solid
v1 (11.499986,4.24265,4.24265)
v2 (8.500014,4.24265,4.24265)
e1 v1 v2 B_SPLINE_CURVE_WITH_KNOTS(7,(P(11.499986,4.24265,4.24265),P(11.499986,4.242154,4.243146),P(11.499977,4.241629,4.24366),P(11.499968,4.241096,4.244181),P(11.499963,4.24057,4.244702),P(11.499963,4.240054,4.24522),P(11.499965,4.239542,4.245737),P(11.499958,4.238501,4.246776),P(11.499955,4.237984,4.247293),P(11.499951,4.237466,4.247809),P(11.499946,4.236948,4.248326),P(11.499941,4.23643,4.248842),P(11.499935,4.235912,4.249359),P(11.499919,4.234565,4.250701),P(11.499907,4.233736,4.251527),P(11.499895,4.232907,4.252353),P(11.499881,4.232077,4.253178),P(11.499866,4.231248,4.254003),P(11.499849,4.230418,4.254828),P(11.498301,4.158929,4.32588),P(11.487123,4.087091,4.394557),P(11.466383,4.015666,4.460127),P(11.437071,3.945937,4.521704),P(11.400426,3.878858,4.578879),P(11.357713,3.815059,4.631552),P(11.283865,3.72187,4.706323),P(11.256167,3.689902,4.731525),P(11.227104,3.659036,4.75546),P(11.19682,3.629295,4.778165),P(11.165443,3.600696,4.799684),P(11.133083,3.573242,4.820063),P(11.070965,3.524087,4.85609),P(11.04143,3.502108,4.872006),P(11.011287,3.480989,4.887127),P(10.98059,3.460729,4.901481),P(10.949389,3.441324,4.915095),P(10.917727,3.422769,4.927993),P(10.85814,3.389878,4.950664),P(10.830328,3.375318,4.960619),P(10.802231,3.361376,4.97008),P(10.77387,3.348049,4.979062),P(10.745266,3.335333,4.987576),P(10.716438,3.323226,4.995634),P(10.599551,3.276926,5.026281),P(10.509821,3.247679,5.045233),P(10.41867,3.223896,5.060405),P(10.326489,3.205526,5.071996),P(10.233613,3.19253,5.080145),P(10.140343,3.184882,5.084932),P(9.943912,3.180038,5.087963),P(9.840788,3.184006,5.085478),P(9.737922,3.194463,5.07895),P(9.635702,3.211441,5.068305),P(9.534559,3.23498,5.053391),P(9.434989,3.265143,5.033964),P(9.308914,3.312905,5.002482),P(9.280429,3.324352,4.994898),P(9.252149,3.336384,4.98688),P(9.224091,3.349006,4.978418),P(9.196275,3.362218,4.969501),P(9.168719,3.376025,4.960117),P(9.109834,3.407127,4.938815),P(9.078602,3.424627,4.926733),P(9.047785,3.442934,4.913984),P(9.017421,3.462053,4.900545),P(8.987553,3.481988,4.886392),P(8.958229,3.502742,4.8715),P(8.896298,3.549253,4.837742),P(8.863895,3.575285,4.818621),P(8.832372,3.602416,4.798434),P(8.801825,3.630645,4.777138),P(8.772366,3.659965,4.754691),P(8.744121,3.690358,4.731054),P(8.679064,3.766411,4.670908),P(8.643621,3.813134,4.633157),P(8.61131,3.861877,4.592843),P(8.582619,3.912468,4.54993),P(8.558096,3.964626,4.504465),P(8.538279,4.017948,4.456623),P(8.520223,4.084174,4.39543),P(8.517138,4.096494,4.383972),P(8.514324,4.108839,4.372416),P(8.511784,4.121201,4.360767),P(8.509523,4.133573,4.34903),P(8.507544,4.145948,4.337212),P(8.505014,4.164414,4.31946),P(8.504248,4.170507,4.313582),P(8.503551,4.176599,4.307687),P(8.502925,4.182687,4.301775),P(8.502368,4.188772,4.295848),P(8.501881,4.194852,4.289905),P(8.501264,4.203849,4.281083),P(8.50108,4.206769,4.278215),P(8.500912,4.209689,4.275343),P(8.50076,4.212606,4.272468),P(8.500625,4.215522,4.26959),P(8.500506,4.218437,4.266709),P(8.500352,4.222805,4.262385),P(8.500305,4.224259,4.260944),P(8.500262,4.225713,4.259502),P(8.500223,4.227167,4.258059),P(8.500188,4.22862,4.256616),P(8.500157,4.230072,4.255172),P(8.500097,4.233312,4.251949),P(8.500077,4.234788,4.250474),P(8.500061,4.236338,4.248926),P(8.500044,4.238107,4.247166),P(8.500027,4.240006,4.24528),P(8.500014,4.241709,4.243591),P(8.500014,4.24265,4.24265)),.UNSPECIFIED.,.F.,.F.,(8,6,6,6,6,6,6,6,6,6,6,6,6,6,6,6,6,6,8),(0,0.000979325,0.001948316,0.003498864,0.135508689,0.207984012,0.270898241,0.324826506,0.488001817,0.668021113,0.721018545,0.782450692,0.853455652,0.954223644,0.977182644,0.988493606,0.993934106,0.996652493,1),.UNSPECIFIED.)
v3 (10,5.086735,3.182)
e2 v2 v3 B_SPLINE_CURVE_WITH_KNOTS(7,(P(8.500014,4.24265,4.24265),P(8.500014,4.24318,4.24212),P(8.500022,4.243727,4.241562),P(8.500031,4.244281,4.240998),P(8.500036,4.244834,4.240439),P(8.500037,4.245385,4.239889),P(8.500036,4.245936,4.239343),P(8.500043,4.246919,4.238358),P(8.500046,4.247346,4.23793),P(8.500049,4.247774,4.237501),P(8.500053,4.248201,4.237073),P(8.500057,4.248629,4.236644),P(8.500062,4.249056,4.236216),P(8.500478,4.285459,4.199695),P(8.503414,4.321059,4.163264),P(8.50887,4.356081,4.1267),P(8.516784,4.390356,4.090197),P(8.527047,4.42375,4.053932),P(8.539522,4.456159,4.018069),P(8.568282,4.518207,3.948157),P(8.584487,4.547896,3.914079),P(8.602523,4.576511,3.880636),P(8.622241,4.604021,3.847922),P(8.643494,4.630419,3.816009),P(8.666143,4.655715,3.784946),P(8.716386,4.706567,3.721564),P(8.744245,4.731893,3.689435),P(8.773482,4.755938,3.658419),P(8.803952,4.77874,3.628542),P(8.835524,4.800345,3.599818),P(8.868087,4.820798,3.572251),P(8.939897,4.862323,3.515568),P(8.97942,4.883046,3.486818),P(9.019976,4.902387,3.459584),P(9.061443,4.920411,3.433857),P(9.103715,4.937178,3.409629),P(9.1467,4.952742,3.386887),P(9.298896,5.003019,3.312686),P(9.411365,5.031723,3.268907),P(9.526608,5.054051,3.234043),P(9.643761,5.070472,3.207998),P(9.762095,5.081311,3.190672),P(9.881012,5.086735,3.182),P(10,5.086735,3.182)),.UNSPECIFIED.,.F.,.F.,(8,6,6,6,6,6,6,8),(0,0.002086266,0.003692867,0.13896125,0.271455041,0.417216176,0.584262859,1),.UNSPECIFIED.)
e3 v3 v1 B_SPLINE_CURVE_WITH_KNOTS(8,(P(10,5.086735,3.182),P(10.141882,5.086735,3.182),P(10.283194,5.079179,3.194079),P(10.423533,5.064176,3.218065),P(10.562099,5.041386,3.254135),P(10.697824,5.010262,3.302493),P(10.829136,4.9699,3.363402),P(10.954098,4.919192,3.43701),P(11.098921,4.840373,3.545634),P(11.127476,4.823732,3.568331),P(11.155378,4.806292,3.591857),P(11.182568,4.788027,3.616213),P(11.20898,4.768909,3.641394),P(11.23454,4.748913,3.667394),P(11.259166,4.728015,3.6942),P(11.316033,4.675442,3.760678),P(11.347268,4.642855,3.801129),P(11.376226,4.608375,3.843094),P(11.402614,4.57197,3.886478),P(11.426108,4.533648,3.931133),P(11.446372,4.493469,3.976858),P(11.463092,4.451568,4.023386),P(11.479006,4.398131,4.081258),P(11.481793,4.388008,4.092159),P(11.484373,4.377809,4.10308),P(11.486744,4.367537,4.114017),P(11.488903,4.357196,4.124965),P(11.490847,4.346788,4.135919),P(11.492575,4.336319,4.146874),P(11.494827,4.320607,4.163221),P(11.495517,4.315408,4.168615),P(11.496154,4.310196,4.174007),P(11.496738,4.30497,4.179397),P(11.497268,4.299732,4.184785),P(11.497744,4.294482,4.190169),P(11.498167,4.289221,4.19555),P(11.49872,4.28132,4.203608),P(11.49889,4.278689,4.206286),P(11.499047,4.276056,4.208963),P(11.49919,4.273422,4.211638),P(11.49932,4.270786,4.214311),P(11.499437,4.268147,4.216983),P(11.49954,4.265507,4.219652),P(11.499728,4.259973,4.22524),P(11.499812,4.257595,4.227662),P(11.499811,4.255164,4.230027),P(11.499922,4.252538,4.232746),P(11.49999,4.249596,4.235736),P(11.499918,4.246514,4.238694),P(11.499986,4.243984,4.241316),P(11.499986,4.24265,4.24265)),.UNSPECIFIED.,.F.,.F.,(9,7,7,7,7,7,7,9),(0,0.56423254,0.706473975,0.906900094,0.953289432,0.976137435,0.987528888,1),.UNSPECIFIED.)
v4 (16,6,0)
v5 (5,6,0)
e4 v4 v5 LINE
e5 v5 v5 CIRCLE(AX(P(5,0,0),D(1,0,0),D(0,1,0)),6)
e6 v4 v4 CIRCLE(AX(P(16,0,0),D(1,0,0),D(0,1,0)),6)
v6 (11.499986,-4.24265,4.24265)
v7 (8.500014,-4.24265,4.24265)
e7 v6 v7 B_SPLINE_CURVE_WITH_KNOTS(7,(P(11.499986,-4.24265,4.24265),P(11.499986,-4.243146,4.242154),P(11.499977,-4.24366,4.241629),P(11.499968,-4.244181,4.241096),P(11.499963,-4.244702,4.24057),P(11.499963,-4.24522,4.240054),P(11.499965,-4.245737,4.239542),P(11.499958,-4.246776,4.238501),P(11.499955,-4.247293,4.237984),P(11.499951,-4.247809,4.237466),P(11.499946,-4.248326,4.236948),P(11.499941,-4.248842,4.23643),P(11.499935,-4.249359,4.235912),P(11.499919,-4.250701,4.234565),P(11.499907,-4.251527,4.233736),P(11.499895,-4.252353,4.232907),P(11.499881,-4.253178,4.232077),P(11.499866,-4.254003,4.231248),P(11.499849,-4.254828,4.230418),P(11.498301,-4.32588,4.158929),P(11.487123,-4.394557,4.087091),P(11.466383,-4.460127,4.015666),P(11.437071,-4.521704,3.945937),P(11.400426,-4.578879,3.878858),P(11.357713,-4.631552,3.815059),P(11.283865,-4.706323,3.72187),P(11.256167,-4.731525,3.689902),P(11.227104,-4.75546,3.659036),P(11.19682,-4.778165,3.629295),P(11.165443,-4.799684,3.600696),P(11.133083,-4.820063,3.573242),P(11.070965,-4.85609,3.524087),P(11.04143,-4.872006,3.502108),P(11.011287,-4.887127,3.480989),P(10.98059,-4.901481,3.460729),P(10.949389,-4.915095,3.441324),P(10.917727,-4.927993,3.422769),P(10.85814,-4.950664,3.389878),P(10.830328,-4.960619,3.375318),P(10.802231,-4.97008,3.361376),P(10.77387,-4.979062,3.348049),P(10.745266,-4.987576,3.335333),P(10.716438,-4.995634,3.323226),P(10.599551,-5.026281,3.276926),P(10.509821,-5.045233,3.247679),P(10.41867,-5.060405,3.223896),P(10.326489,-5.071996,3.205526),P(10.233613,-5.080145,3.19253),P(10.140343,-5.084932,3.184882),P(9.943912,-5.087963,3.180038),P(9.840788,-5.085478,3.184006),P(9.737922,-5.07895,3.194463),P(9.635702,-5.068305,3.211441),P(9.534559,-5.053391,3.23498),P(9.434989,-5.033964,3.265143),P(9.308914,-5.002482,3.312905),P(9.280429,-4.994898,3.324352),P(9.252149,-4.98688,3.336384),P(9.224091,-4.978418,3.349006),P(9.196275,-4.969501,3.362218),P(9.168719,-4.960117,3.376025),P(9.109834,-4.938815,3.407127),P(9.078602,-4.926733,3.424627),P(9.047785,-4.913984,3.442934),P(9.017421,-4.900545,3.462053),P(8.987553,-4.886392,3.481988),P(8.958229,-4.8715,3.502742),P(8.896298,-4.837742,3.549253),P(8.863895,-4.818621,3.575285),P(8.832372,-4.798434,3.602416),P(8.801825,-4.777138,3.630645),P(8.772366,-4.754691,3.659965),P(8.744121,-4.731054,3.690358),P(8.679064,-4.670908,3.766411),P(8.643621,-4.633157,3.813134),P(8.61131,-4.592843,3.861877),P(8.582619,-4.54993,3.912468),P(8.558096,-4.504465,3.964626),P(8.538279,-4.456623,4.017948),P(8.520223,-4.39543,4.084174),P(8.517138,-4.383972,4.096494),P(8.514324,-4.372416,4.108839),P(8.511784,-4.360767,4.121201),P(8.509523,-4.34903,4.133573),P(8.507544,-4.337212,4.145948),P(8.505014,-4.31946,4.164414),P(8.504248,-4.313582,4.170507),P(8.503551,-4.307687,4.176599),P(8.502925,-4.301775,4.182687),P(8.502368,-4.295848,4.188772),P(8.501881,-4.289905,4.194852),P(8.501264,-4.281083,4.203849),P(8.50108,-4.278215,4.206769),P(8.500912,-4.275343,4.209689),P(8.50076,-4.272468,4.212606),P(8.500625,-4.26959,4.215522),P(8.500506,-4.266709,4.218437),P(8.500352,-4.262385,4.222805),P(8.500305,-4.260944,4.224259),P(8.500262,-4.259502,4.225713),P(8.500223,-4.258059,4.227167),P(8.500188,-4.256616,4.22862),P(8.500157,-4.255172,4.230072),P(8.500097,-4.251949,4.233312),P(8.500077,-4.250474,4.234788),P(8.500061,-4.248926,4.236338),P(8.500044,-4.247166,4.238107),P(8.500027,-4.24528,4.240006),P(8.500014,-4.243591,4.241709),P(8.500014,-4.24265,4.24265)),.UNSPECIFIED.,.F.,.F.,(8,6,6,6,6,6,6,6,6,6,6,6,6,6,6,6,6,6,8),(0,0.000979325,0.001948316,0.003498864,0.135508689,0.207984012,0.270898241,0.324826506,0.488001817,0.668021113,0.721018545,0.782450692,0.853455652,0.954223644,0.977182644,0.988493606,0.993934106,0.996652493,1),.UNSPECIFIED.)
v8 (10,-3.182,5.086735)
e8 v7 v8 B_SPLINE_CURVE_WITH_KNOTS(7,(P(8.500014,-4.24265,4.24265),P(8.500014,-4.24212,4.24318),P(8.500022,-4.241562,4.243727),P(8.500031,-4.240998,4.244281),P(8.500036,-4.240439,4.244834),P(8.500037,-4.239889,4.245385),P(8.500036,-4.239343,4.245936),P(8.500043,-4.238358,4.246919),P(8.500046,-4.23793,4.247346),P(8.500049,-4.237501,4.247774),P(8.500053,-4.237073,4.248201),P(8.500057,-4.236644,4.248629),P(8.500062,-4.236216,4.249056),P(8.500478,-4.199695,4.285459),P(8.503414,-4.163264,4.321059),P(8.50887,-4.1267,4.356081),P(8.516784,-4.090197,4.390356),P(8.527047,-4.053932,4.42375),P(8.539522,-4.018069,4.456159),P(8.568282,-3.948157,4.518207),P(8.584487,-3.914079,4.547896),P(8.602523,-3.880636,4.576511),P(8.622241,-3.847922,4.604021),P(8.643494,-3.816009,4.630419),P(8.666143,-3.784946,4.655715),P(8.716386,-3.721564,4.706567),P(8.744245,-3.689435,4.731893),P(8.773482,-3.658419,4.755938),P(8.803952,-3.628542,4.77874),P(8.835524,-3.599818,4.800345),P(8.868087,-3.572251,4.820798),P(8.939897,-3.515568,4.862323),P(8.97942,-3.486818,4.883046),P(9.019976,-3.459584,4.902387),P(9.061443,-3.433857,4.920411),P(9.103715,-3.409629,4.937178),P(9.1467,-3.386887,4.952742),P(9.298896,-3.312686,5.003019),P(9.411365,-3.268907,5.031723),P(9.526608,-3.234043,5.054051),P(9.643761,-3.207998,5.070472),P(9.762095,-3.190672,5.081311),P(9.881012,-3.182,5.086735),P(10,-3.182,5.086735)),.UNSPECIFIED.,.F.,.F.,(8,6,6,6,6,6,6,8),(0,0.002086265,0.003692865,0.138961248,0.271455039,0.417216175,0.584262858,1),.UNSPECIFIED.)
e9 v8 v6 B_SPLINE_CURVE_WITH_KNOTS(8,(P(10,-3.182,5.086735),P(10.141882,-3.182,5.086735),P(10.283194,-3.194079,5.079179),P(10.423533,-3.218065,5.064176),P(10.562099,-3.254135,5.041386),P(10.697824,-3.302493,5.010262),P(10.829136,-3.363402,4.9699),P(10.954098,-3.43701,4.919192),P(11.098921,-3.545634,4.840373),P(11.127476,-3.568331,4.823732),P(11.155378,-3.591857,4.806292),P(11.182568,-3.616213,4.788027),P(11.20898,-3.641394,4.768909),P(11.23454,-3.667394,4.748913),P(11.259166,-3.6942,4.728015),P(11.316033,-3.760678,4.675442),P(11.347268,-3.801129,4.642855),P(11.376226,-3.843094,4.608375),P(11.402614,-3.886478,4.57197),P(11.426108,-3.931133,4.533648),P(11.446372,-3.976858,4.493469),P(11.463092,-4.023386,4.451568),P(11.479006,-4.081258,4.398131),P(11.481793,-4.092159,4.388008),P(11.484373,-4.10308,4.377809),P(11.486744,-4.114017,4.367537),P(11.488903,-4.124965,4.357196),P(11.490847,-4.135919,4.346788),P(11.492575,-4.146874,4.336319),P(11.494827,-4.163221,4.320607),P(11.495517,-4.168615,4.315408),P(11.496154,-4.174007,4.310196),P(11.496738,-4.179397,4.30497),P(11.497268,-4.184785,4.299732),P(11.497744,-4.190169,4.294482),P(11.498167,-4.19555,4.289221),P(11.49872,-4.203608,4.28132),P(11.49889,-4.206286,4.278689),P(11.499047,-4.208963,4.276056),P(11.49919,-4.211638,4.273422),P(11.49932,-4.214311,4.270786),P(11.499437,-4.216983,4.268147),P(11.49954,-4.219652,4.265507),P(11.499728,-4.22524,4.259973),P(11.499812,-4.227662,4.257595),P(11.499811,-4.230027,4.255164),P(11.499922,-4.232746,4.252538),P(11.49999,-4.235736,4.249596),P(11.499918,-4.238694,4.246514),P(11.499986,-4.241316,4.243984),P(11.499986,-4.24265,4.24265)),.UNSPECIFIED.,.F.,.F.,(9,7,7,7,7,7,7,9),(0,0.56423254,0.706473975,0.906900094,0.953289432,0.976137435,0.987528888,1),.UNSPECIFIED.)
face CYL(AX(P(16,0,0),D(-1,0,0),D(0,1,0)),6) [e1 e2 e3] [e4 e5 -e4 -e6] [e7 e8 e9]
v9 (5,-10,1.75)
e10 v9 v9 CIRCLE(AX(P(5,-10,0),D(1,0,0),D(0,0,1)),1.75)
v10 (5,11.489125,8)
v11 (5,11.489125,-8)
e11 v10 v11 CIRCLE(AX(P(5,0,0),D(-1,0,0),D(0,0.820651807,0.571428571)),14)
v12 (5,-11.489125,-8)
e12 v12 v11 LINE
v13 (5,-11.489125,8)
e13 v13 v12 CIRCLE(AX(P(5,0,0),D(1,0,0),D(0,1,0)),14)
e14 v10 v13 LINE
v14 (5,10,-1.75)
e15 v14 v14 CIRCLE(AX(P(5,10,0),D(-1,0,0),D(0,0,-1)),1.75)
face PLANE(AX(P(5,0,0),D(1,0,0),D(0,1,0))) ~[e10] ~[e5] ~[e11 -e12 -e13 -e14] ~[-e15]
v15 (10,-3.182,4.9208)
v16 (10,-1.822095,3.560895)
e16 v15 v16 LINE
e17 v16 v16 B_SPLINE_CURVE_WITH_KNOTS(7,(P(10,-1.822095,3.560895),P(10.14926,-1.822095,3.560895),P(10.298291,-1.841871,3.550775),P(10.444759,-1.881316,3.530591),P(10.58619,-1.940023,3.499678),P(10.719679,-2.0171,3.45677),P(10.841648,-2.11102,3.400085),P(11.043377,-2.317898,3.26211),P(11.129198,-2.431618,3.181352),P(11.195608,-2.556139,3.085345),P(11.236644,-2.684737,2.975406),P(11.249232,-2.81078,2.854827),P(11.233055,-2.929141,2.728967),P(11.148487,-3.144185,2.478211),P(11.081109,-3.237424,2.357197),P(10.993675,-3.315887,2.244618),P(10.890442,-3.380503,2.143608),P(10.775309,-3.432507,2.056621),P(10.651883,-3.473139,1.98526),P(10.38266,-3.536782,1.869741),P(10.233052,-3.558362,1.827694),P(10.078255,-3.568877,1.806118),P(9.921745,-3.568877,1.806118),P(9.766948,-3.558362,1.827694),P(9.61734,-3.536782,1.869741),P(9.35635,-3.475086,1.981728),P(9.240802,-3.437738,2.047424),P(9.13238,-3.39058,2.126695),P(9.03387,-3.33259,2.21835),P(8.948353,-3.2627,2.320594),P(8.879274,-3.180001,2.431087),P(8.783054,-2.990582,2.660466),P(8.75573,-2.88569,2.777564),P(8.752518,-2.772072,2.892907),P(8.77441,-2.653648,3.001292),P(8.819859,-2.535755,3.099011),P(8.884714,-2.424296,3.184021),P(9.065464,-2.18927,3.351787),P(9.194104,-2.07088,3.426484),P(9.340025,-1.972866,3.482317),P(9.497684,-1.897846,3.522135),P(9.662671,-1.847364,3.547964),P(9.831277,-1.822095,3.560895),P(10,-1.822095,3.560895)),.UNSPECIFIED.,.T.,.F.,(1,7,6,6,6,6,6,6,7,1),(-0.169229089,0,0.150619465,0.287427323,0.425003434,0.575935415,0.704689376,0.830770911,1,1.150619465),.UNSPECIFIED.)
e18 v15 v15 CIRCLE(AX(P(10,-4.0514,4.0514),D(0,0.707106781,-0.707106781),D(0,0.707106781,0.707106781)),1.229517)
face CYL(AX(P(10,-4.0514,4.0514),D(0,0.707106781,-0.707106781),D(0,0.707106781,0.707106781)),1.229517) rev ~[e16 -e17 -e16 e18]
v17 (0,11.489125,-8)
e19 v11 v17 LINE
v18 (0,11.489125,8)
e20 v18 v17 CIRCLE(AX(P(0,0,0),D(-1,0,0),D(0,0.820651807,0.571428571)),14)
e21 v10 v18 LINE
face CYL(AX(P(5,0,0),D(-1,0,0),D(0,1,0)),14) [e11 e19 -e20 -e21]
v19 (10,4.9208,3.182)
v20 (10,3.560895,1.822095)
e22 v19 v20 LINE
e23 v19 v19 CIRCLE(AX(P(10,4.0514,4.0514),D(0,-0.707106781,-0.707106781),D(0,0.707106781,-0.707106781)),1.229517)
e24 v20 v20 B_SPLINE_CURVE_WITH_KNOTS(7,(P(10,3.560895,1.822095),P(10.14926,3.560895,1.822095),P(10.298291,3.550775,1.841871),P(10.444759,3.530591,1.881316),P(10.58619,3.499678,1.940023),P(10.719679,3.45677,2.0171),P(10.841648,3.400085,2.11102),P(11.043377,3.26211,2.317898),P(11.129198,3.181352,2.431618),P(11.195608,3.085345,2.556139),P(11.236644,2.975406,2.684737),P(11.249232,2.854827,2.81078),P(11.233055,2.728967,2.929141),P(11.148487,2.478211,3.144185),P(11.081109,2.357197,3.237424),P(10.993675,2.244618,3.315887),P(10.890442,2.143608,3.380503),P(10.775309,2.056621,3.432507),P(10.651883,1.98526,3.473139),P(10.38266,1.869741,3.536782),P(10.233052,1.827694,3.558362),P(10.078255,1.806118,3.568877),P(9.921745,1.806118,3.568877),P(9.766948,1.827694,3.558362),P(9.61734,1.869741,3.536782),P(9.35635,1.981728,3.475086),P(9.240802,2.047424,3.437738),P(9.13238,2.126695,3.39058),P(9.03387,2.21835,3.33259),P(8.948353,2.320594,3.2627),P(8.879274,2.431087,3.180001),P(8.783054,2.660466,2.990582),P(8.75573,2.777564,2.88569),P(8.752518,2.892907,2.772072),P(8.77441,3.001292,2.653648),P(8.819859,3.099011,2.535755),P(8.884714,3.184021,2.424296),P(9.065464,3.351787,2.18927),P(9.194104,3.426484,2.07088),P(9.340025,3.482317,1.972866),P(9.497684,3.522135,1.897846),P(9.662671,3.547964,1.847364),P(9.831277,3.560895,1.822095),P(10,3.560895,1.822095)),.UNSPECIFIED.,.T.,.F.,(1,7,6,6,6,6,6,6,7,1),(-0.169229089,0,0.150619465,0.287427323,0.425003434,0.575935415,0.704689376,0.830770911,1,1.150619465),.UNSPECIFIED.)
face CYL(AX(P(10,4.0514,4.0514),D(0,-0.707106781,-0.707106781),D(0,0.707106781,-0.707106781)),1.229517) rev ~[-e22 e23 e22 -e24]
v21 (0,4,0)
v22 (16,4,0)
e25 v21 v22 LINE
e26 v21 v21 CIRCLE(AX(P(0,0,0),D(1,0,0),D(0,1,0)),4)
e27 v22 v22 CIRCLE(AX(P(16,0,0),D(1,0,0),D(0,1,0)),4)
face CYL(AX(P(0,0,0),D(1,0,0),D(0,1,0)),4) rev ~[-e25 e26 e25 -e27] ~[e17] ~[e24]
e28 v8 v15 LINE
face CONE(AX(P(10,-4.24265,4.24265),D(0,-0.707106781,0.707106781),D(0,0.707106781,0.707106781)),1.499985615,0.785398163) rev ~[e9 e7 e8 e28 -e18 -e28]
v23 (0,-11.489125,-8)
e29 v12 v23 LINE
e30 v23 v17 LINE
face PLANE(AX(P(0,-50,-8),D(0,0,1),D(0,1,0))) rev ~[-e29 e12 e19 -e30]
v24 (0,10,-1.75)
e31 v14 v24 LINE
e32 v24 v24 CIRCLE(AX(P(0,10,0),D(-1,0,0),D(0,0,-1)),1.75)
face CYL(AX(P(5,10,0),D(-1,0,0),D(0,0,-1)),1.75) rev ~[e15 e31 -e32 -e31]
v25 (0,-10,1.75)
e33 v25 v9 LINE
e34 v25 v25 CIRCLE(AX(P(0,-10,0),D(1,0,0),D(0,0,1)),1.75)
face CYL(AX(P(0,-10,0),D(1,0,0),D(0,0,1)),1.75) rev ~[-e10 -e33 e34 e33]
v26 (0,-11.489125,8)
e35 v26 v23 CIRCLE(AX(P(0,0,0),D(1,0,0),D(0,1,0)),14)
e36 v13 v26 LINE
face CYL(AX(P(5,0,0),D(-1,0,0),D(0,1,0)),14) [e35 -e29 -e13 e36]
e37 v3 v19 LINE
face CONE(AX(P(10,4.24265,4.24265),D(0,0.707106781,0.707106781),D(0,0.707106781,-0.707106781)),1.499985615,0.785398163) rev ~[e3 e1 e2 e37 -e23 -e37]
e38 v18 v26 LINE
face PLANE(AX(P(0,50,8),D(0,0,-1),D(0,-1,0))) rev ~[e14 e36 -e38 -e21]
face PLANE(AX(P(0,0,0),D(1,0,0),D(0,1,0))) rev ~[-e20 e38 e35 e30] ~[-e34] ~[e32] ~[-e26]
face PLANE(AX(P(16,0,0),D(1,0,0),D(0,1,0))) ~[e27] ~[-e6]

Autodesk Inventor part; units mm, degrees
sketch "Sketch_1" plane through (0, 0, 0) normal (0, 0, 1) x (1, 0, 0)
  line L0 (16, 0) -> (0, 0)
  line L1 (0, 4) -> (16, 4)
  line L2 (16, 4) -> (16, 6)
  line L3 (16, 6) -> (5, 6)
  line L4 (5, 6) -> (5, 14)
  line L5 (5, 14) -> (0, 14)
  line L6 (0, 14) -> (0, 4)
revolve "Revolution1" add sketch "Sketch_1" angle 360 about axis through (16, 0, 0) along (1, 0, 0)
sketch "Sketch_19" plane through (10, 0, 0) normal (1, 0, 0) x (0, 0, -1)
  line L0 (-2.1213, 2.1213) -> (-4.2426, 4.2426)
  line L1 (-4.2426, 4.2426) -> (-3.182, 5.3033)
  line L2 (-3.182, 5.3033) -> (-3.182, 4.9208)
  line L3 (-3.182, 4.9208) -> (-1.2519, 2.9907)
  line L4 (-1.2519, 2.9907) -> (-2.1213, 2.1213)
  line L5 (-2.1213, 2.1213) -> (-4.2426, 4.2426)
revolve "Revolution2" cut sketch "Sketch_19" angle 360 about axis through (10, 2.1213, 2.1213) along (0, -0.7071068, -0.7071068)
thread "Thread1" size "M3x0.5" class "6H" standard "ISO Metric profile" length 2.7295
sketch "Sketch_3" plane through (10, 0, 0) normal (1, 0, 0) x (0, 0, -1)
  line L0 (-2.1213, -2.1213) -> (-4.2426, -4.2426)
  line L1 (-4.2426, -4.2426) -> (-5.3033, -3.182)
  line L2 (-5.3033, -3.182) -> (-4.9208, -3.182)
  line L3 (-4.9208, -3.182) -> (-2.9907, -1.2519)
  line L4 (-2.9907, -1.2519) -> (-2.1213, -2.1213)
  line L5 (-2.1213, -2.1213) -> (-4.2426, -4.2426)
revolve "Revolution3" cut sketch "Sketch_3" angle 360 about axis through (10, -2.1213, 2.1213) along (0, 0.7071068, -0.7071068)
thread "Thread2" size "M3x0.5" class "6H" standard "ISO Metric profile" length 2.7295
sketch "Sketch4" plane through (5, 0, 0) normal (1, 0, 0) x (0, 0, -1)
  point P0 (0, 10)
hole "Hole1" at (5, 10, 0) direction (-1, 0, 0) diameter 3.5 depth 5
sketch "Sketch5" plane through (0, 0, 0) normal (-1, 0, 0) x (0, 0, 1)
  point P0 (0, -10)
hole "Hole2" at (0, -10, 0) direction (1, 0, 0) diameter 3.5 depth 5
sketch "Sketch_4" plane through (0, 0, 0) normal (1, 0, 0) x (0, 1, 0)
  circle A0 centre (0, 0) radius 150
  line L0 (50, 8) -> (-50, 8)
  line L1 (-50, 8) -> (-50, -8)
  line L2 (-50, -8) -> (50, -8)
  line L3 (50, -8) -> (50, 8)
extrude "Extrusion1" cut sketch "Sketch_4" along normal blind 16
ref_plane "to_screw1_XY" through (10, -2.8284, 2.8284) normal (0, -0.7071068, 0.7071068) x (1, 0, 0)
ref_plane "to_screw1_YZ" through (10, -2.8284, 2.8284) normal (1, 0, 0) x (0, 0.7071068, 0.7071068)
ref_plane "to_screw1_ZX" through (10, -2.8284, 2.8284) normal (0, 0.7071068, 0.7071068) x (0, -0.7071068, 0.7071068)
ref_plane "to_screw2_XY" through (10, 2.8284, 2.8284) normal (0, 0.7071068, 0.7071068) x (1, 0, 0)
ref_plane "to_screw2_YZ" through (10, 2.8284, 2.8284) normal (1, 0, 0) x (0, 0.7071068, -0.7071068)
ref_plane "to_screw2_ZX" through (10, 2.8284, 2.8284) normal (0, 0.7071068, -0.7071068) x (0, 0.7071068, 0.7071068)
properties part number "ATHC8-MB_b"
